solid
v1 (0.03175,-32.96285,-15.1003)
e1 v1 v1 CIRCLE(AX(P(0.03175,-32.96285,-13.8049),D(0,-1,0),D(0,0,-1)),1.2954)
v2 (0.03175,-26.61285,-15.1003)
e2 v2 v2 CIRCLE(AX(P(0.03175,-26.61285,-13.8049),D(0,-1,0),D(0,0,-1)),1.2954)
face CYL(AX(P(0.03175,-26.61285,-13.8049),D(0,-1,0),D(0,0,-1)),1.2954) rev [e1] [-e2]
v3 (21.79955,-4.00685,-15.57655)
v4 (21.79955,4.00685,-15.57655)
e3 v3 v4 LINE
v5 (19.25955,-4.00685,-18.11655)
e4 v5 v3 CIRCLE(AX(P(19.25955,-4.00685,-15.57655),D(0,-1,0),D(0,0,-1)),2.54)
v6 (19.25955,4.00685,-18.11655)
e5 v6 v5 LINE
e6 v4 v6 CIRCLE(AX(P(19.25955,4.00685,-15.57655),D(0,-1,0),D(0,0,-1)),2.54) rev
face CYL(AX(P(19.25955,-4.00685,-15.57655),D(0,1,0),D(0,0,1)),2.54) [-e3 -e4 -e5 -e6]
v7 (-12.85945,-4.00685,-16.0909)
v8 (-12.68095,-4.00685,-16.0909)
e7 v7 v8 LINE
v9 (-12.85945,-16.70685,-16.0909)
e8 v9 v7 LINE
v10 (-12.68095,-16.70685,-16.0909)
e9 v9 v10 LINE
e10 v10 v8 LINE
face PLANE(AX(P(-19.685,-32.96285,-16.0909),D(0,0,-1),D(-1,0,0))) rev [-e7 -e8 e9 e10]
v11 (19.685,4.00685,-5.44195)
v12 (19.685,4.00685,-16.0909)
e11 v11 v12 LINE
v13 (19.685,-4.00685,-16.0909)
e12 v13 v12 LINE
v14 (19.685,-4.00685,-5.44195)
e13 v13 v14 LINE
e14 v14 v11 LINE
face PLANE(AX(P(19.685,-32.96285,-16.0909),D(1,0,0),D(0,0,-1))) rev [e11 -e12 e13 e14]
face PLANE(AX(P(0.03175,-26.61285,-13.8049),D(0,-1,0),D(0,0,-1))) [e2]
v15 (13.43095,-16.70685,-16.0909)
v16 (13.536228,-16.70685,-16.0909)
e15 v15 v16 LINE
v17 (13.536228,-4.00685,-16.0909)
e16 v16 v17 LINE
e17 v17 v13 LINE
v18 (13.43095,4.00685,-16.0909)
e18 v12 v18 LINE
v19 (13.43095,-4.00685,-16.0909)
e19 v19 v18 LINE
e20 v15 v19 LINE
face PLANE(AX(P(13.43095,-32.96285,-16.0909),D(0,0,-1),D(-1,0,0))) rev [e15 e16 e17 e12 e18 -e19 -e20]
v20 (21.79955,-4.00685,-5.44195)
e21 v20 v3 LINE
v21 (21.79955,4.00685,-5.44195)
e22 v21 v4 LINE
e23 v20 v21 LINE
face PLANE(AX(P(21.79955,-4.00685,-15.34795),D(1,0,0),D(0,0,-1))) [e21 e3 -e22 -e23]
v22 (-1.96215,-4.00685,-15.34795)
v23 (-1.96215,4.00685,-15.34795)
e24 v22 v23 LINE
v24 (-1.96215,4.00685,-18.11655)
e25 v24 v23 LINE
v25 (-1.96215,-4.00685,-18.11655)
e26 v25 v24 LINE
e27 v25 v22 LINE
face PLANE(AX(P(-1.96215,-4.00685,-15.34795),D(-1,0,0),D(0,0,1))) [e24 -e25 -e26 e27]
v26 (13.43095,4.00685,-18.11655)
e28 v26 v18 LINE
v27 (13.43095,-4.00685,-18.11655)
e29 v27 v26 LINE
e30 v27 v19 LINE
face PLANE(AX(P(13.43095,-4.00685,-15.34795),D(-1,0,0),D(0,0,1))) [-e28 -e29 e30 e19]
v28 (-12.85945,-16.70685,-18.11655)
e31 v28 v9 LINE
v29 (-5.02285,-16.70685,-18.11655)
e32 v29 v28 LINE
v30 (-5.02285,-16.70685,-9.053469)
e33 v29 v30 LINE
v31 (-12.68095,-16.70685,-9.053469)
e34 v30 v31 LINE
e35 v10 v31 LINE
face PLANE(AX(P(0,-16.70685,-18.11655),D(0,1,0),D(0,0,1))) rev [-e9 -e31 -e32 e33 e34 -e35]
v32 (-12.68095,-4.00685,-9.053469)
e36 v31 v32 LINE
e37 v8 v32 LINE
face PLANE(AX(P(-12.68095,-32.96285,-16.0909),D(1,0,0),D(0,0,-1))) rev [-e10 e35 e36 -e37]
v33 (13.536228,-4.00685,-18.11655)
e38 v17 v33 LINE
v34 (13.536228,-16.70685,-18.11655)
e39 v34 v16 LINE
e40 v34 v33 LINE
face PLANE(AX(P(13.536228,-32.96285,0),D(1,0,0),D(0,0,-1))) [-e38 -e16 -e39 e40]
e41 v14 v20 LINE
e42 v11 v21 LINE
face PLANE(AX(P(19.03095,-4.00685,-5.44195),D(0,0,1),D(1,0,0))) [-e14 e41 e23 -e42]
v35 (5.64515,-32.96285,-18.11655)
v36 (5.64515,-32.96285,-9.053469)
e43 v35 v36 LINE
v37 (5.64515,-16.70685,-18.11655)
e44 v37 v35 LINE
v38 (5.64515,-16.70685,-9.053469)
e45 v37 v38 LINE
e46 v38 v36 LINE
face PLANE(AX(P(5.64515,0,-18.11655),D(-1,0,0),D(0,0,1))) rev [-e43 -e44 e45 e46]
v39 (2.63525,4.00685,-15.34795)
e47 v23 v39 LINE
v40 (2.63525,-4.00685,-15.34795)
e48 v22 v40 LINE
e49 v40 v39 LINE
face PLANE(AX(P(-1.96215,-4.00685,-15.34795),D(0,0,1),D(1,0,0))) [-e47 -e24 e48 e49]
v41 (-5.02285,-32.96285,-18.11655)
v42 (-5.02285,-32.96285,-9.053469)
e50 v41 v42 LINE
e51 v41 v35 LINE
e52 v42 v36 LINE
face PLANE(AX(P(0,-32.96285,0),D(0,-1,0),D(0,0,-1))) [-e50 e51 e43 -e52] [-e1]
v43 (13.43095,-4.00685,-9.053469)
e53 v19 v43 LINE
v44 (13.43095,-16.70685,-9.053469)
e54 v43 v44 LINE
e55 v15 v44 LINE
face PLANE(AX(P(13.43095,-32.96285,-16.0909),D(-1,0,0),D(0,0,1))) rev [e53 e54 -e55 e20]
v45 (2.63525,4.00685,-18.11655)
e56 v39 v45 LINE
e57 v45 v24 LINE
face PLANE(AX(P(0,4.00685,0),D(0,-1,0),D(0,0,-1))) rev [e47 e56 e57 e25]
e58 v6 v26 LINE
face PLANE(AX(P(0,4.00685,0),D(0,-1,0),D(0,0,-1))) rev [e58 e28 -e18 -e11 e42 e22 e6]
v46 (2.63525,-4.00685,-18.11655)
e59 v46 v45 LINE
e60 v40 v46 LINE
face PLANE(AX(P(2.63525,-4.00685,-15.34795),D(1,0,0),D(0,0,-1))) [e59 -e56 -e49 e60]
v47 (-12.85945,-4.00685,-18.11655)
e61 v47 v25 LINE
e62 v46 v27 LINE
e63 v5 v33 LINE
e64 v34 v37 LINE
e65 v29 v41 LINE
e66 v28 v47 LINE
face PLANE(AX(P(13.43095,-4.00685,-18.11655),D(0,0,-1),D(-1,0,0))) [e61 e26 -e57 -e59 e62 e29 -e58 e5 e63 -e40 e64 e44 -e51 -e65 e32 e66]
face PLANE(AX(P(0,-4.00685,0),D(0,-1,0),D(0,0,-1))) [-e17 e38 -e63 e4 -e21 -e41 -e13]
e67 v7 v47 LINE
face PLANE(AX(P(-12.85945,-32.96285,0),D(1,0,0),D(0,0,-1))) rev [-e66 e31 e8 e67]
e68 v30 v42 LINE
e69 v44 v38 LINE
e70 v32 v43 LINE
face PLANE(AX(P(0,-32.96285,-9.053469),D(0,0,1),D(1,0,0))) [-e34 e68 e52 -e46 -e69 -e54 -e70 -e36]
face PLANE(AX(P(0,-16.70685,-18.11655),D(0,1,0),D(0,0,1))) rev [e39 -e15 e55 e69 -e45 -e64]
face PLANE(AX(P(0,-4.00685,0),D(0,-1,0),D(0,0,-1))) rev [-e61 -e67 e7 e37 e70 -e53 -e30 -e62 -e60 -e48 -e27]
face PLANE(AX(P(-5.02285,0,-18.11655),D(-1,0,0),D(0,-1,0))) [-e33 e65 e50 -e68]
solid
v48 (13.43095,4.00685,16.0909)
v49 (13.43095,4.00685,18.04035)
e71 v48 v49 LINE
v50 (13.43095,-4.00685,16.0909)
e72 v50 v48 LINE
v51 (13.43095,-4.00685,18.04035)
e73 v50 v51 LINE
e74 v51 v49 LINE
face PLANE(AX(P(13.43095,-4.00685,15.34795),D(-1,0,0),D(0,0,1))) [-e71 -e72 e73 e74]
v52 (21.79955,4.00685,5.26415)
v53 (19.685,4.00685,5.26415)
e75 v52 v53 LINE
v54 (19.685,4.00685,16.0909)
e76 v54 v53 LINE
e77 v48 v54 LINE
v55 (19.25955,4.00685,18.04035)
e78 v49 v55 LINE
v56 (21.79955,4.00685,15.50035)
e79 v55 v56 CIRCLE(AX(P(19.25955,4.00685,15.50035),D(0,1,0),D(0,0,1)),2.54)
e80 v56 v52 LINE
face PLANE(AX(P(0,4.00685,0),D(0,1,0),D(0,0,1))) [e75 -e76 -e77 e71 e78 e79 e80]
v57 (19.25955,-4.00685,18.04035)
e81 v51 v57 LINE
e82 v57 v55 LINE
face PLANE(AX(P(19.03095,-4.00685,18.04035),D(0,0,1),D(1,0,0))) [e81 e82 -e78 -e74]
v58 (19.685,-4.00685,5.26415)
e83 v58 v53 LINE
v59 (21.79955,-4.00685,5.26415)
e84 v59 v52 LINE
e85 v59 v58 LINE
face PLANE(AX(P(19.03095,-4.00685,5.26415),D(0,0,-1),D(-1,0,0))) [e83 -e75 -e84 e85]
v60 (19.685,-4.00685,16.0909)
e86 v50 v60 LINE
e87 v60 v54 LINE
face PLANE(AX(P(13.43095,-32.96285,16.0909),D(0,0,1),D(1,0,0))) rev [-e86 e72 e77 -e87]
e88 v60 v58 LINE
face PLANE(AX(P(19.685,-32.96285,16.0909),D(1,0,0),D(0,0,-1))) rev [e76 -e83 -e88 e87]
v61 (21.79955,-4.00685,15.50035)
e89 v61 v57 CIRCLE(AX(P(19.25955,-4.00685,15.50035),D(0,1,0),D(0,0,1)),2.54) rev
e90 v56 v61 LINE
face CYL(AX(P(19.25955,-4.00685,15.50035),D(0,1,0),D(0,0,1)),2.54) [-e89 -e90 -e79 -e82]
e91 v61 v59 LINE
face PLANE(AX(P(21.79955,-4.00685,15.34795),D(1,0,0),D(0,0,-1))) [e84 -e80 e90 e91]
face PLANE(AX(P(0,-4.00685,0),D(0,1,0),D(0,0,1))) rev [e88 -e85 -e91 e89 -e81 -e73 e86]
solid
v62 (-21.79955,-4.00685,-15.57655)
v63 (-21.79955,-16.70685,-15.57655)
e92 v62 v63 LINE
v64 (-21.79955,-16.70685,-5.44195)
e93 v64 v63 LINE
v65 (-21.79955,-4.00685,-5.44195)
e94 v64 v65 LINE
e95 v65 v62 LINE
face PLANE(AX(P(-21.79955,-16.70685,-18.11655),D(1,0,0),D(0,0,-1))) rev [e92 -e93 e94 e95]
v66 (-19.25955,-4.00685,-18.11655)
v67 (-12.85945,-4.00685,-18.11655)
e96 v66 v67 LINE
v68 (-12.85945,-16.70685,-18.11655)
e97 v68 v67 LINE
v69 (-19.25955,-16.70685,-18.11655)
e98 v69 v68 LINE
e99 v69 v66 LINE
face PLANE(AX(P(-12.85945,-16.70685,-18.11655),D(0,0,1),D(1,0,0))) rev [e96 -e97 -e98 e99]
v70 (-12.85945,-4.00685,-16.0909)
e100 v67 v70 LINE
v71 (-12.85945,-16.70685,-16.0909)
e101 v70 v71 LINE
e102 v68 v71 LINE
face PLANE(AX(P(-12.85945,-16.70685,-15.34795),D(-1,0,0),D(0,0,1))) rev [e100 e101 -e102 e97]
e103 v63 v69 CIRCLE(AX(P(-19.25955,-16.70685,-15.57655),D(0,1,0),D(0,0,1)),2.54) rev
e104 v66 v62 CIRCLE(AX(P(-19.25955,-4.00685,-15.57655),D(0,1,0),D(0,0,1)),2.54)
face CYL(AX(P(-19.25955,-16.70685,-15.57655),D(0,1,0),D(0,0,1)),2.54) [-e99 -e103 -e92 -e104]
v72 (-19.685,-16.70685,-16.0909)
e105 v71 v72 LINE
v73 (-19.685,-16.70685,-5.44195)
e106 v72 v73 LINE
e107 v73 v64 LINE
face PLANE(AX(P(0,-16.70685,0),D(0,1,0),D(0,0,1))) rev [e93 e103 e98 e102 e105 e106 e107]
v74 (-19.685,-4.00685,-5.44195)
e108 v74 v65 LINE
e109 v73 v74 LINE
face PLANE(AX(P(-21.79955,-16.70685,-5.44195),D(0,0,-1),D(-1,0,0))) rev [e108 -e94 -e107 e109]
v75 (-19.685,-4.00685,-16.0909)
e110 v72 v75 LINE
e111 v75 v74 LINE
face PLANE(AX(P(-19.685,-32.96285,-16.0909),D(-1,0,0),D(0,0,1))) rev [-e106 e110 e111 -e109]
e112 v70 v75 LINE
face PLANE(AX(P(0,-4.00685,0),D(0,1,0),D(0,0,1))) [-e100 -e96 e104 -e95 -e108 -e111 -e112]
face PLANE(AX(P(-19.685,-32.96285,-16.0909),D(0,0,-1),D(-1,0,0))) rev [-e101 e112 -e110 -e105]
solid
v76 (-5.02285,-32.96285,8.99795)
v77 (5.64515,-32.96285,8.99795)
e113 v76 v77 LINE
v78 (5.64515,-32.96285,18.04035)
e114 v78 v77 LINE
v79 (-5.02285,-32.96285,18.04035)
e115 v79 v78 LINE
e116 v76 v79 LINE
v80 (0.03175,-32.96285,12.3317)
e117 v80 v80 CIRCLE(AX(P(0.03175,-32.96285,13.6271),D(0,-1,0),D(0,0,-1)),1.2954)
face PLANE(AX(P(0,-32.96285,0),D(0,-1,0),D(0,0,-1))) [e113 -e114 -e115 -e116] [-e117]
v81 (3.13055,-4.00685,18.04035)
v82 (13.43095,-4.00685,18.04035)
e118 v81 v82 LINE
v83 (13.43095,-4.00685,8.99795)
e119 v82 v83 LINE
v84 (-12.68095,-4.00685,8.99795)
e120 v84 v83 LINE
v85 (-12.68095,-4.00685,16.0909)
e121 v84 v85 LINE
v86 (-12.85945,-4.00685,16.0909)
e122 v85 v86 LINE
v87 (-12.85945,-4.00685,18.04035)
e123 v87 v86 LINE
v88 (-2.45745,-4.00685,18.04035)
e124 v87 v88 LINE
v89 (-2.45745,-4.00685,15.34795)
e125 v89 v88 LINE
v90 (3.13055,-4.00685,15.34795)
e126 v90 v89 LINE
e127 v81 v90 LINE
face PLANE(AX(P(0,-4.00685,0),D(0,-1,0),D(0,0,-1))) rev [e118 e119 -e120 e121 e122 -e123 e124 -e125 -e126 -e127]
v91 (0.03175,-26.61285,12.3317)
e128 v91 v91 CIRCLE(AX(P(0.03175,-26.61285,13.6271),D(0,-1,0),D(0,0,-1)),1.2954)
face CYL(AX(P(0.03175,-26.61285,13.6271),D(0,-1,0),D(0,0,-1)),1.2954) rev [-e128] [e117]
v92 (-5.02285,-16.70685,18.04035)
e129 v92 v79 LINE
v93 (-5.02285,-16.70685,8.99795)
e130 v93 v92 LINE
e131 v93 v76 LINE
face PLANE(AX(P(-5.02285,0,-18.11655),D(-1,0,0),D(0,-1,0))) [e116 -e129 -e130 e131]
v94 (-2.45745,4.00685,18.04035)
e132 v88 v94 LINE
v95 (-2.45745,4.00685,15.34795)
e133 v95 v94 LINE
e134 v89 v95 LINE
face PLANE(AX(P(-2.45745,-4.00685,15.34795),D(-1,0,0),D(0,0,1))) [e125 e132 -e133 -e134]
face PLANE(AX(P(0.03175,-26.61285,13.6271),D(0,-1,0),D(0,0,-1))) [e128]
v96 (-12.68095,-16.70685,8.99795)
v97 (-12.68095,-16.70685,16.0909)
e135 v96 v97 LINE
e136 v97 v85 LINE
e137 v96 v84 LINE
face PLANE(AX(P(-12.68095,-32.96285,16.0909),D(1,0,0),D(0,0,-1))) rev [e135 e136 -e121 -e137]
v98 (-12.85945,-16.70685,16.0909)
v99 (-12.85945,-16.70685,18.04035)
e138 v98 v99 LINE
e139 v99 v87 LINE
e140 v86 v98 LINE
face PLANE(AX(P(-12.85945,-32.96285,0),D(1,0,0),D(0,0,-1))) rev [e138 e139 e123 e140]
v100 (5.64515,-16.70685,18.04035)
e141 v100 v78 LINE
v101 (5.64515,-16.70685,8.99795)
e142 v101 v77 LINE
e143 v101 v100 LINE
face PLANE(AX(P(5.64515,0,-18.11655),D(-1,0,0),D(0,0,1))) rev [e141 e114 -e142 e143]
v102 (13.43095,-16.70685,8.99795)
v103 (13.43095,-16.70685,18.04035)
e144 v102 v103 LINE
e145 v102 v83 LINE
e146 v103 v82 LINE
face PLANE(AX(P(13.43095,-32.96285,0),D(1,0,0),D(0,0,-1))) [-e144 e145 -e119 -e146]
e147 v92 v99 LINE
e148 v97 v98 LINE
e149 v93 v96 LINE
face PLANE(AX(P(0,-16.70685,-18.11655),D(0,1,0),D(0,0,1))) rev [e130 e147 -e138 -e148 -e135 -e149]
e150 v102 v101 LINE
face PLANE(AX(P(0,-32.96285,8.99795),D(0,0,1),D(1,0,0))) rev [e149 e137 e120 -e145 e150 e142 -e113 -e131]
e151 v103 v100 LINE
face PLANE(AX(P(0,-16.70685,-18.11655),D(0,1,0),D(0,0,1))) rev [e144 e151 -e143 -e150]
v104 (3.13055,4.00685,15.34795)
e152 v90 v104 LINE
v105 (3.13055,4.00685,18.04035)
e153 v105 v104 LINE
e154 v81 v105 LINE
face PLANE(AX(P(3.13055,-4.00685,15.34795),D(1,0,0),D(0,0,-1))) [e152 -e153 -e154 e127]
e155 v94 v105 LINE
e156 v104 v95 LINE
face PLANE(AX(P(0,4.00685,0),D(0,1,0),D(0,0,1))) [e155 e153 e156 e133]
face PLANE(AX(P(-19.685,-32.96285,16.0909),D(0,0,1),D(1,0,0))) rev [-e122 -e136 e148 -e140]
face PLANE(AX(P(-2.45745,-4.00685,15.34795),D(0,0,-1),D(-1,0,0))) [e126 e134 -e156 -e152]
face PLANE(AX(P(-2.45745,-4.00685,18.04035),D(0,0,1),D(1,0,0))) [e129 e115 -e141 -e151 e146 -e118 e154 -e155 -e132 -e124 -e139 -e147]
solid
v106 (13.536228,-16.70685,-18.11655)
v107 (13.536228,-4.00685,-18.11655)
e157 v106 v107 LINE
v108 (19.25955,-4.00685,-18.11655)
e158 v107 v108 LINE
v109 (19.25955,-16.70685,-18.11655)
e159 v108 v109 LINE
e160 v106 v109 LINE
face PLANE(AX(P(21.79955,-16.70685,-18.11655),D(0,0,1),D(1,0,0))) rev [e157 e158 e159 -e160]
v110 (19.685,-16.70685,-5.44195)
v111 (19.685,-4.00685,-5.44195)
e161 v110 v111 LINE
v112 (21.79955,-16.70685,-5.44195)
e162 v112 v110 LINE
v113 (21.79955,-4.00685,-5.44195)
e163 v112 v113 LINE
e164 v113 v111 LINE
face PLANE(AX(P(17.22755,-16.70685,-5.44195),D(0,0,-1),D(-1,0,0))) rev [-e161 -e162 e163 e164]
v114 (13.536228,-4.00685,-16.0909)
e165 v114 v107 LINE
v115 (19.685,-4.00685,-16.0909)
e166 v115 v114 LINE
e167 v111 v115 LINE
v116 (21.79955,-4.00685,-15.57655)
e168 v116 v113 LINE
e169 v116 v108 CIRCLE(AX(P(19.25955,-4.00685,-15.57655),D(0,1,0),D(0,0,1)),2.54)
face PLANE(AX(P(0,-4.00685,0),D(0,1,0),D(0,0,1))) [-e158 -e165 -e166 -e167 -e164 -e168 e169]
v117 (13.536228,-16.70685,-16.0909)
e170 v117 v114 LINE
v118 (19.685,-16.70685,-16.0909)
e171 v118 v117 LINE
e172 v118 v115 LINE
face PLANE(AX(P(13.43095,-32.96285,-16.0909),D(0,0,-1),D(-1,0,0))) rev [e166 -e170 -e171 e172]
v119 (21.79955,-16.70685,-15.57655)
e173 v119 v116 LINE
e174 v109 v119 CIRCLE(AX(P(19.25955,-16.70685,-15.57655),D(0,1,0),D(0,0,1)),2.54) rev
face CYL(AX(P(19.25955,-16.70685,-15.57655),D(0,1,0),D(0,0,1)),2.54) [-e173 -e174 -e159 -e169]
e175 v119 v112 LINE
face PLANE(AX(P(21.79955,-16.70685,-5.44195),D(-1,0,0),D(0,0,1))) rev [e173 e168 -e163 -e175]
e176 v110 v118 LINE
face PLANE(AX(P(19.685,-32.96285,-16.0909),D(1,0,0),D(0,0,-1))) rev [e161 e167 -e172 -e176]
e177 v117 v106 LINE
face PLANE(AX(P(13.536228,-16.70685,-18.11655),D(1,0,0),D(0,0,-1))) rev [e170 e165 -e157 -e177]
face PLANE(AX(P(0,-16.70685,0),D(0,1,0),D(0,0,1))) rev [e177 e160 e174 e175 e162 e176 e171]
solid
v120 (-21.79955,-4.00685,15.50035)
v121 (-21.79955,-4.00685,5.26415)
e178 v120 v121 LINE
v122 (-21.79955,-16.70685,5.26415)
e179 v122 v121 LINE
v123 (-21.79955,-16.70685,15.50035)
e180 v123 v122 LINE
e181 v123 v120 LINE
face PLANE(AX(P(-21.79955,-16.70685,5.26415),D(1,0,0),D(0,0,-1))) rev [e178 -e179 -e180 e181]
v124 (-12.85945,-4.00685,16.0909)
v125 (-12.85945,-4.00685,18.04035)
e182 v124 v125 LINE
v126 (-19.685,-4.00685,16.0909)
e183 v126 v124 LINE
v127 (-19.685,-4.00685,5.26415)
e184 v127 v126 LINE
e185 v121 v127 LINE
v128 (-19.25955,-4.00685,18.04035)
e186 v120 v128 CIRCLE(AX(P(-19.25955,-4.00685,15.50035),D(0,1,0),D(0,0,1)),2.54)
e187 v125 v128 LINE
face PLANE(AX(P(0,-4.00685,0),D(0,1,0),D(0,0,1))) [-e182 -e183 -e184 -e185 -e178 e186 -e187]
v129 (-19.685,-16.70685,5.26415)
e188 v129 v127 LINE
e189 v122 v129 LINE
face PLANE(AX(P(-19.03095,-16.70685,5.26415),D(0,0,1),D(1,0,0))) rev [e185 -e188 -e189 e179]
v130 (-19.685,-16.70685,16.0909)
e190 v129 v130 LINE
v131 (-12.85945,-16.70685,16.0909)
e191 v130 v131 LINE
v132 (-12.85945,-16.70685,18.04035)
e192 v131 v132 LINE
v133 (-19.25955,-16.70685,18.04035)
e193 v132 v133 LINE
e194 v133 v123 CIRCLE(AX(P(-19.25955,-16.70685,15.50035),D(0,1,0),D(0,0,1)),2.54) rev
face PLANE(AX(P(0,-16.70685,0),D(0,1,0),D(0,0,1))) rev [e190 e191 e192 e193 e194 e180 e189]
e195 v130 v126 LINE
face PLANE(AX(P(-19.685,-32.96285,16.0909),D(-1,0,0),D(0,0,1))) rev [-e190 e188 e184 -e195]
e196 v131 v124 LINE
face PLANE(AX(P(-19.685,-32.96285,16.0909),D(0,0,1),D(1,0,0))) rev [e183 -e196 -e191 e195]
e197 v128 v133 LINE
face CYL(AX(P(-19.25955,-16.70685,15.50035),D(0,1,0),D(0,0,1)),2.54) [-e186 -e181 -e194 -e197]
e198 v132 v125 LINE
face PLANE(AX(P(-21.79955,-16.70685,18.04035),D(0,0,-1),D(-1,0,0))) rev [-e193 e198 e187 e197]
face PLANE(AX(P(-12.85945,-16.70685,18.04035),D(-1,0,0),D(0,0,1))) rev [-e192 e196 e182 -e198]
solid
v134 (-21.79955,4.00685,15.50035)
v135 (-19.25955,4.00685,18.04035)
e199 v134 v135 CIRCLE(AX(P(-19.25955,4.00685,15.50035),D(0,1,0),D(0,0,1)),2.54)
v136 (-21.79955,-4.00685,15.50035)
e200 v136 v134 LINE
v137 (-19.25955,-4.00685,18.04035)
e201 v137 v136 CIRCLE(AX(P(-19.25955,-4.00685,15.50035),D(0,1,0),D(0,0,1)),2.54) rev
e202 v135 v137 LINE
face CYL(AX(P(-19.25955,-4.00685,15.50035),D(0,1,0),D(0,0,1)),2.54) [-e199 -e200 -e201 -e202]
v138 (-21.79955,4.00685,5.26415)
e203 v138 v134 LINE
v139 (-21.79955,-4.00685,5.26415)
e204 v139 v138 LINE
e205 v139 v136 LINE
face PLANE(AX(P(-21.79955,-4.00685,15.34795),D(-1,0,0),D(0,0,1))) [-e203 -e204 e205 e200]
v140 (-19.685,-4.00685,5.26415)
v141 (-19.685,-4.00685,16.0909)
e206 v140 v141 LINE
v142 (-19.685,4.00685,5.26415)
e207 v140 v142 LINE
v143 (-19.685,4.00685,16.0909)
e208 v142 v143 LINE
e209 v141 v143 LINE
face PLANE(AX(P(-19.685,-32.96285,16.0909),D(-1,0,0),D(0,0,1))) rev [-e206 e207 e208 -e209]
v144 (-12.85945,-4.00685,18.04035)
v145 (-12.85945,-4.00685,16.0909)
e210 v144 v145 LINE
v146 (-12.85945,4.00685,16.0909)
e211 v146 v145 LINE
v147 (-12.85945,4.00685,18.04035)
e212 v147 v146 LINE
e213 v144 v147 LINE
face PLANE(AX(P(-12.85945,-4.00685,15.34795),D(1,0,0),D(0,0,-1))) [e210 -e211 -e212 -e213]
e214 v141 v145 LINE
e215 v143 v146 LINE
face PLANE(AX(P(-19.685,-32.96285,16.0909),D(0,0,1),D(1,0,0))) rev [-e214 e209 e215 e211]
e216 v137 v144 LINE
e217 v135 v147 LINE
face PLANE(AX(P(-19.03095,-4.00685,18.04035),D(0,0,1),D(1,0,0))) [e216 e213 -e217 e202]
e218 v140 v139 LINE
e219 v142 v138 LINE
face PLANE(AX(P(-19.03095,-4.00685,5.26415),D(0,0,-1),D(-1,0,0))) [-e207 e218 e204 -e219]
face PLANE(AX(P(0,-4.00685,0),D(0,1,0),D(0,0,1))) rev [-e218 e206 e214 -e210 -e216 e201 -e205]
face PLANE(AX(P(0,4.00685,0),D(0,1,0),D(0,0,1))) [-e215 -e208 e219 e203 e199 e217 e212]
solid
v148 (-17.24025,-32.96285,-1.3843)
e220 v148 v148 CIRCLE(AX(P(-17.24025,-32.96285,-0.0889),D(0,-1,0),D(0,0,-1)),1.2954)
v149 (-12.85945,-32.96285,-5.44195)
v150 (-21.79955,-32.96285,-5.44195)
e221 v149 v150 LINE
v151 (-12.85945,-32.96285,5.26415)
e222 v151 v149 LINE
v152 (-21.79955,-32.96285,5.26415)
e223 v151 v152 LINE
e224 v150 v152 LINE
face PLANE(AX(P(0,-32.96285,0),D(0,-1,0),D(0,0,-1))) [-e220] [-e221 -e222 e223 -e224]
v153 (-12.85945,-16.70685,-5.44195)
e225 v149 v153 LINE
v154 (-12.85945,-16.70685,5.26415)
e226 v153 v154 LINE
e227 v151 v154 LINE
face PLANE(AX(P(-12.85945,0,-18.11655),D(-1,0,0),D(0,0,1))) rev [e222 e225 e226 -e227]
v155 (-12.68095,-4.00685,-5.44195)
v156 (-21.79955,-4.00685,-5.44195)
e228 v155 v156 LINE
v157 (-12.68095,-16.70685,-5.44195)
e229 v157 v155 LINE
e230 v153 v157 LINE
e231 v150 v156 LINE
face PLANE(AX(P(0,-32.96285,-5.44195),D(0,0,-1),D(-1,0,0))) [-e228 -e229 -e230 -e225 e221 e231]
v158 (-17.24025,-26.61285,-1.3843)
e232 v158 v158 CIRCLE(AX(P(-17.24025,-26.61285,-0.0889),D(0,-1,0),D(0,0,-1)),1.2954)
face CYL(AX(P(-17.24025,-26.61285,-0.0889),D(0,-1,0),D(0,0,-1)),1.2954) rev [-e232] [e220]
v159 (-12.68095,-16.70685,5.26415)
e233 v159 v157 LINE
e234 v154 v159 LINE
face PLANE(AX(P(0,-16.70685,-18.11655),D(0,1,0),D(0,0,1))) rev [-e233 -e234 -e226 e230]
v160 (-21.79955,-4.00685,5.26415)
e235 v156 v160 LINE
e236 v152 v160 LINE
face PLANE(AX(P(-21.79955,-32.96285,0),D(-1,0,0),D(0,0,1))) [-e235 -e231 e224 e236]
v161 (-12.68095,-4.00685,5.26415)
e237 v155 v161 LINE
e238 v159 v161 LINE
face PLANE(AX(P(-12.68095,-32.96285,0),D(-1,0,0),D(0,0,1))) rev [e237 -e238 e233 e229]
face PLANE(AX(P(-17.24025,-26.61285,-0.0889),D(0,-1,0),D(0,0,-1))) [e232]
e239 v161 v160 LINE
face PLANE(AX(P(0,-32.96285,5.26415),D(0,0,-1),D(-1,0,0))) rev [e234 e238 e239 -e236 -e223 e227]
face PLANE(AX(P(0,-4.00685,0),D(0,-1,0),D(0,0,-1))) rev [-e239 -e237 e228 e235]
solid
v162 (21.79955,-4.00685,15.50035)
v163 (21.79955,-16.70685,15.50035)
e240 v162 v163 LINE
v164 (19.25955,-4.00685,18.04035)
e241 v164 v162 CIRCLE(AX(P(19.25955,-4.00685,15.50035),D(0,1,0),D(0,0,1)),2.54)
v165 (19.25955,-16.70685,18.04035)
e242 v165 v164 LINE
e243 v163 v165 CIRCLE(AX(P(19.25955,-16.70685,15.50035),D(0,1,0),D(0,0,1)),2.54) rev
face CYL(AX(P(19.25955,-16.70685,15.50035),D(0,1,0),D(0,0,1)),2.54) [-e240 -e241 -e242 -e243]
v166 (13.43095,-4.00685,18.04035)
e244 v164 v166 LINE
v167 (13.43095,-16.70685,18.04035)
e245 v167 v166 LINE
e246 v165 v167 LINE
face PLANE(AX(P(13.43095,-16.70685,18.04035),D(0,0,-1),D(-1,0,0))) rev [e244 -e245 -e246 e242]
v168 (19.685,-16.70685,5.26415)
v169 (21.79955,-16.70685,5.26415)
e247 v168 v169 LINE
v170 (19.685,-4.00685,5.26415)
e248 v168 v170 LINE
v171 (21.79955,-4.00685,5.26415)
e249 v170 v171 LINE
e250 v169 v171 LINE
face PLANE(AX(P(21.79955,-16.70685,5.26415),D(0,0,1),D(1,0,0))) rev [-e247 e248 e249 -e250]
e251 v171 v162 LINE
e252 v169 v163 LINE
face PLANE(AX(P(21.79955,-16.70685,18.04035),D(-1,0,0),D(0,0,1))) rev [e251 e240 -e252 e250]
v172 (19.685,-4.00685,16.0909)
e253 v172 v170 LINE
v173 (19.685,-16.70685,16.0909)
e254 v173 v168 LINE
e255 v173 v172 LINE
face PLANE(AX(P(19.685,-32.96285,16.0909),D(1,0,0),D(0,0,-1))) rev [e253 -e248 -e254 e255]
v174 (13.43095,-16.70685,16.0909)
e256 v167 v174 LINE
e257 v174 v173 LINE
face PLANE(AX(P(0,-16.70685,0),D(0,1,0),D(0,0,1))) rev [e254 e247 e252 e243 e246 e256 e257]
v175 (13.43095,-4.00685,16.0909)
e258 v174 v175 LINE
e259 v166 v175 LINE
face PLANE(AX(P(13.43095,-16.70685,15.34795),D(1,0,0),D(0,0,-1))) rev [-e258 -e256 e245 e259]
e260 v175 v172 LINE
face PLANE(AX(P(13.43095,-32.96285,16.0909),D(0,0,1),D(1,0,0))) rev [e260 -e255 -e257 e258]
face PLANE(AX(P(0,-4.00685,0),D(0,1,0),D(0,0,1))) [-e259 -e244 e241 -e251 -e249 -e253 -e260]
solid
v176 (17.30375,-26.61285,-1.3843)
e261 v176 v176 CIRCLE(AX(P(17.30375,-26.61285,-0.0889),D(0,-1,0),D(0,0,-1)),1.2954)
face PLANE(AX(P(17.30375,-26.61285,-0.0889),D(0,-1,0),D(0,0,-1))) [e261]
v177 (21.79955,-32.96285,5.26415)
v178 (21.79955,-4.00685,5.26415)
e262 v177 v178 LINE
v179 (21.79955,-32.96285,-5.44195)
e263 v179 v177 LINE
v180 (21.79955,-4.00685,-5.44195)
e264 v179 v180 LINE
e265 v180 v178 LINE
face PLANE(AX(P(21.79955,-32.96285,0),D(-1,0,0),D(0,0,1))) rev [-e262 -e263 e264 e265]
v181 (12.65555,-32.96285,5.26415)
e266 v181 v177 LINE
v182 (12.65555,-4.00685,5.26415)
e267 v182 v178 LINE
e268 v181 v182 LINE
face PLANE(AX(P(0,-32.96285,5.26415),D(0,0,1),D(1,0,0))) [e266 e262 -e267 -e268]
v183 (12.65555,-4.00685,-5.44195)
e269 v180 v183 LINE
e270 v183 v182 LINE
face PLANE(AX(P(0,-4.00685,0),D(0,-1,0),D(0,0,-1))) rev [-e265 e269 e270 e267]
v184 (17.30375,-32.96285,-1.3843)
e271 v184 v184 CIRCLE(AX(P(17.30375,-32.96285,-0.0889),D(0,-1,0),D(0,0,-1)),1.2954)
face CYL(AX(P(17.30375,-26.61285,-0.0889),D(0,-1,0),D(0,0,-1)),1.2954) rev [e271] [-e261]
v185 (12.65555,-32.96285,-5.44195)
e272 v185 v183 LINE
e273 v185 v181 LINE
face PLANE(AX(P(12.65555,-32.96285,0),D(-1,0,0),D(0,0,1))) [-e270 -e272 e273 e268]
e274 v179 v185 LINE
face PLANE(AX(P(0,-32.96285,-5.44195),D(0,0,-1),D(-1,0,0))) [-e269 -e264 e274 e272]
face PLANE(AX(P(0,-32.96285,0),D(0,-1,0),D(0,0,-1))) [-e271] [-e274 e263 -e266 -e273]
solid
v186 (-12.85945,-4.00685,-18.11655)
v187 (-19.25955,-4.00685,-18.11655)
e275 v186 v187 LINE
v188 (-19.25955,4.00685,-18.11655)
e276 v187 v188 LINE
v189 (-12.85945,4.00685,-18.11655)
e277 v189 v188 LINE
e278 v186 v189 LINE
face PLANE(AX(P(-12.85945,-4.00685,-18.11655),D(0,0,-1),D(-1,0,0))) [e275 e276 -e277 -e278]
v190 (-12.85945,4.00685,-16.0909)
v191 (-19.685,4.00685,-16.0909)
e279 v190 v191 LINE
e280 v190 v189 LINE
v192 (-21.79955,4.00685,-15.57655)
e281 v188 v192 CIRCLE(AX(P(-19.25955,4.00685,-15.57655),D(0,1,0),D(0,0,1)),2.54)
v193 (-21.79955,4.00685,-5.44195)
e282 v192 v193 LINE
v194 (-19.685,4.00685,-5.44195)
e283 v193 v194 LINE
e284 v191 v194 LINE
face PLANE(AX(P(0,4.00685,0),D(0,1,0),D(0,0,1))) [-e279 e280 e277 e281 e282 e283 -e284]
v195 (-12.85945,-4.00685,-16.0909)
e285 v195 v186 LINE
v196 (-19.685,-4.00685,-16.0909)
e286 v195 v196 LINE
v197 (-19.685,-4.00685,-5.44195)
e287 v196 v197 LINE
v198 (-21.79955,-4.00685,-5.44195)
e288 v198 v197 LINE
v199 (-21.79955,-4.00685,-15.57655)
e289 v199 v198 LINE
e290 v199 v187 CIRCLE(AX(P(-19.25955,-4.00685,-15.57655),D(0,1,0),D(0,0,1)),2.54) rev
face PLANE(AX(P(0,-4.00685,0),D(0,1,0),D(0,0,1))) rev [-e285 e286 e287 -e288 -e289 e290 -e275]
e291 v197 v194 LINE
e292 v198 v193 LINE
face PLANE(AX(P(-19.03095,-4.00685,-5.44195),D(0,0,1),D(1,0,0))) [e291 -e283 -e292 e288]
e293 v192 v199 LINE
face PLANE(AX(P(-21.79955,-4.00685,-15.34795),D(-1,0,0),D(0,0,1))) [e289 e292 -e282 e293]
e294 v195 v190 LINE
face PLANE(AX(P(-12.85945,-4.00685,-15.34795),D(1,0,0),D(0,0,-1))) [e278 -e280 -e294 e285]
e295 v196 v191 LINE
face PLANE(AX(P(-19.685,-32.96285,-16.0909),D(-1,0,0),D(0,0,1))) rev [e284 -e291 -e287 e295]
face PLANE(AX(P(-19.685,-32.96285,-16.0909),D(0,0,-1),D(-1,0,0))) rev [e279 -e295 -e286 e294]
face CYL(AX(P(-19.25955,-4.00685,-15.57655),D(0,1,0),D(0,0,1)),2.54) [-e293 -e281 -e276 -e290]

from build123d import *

# Parameters (mm, degrees)
BOSS_EXTRUDE1_DEPTH        = 4.00685
BOSS_EXTRUDE1_DEPTH_BACK   = 4.00685
SKETCH2_W                  = 4.5974
SKETCH2_H                  = 2.7686
BOSS_EXTRUDE1_2_DEPTH      = 4.00685
BOSS_EXTRUDE1_2_DEPTH_BACK = 4.00685
BOSS_EXTRUDE1_3_DEPTH      = 4.00685
BOSS_EXTRUDE1_3_DEPTH_BACK = 4.00685
BOSS_EXTRUDE1_4_DEPTH      = 4.00685
BOSS_EXTRUDE1_4_DEPTH_BACK = 4.00685
SKETCH2_W_2                = 5.588
SKETCH2_H_2                = 2.6924
BOSS_EXTRUDE1_5_DEPTH      = 4.00685
BOSS_EXTRUDE1_5_DEPTH_BACK = 4.00685
BOSS_EXTRUDE1_6_DEPTH      = 4.00685
BOSS_EXTRUDE1_6_DEPTH_BACK = 4.00685
SKETCH3_W                  = 9.1186
SKETCH3_H                  = 10.7061
BOSS_EXTRUDE2_DEPTH        = 28.956
BOSS_EXTRUDE4_DEPTH        = 12.7
BOSS_EXTRUDE4_2_DEPTH      = 12.7
BOSS_EXTRUDE4_3_DEPTH      = 12.7
BOSS_EXTRUDE4_4_DEPTH      = 12.7
CUT_EXTRUDE4_DEPTH         = 44.473891524
CUT_EXTRUDE4_DEPTH_BACK    = 44.473891524
SKETCH6_W                  = 6.25405
SKETCH6_H                  = 10.64895
SKETCH6_W_2                = 7.00405
SKETCH6_H_2                = 10.82675
CUT_EXTRUDE5_START         = -36.1569
CUT_EXTRUDE5_OUTLINE_W     = 7.8366
CUT_EXTRUDE5_OUTLINE_H     = 16.256
CUT_EXTRUDE5_DEPTH         = 36.1569
CUT_EXTRUDE5_2_OUTLINE_W   = 7.7858
CUT_EXTRUDE5_2_OUTLINE_H   = 16.256
CUT_EXTRUDE5_2_DEPTH       = 9.063080747
CUT_EXTRUDE5_START_2       = -9.0424
CUT_EXTRUDE5_3_OUTLINE_W   = 7.7858
CUT_EXTRUDE5_3_OUTLINE_H   = 16.256
CUT_EXTRUDE5_3_DEPTH       = 9.0424
SKETCH9_W                  = 2.02565
SKETCH9_H                  = 16.256
CUT_EXTRUDE6_DEPTH         = 3.556
FILLET2_R                  = 2.54
FILLET3_R                  = 2.54
FILLET4_R                  = 2.54
FILLET5_R                  = 2.54
FILLET6_R                  = 2.54
FILLET7_R                  = 2.54
FILLET8_R                  = 2.54
FILLET9_R                  = 2.54
SKETCH10_R                 = 1.2954
CUT_EXTRUDE7_DEPTH         = 6.35


# Read off the part's stored shape, not the designer's step: Cut-Extrude5
with BuildPart() as part:
    # Sketch2 → Boss-Extrude1 (new, two sides: drawn at the far end of the back side and taken through both)
    with BuildSketch(Plane(origin=(0, 0, 0), x_dir=(1, 0, 0), z_dir=(0, 1, 0)).offset(-BOSS_EXTRUDE1_DEPTH_BACK)):
        with Locations((0.33655, 16.73225)):
            Rectangle(SKETCH2_W, SKETCH2_H)
    extrude(amount=BOSS_EXTRUDE1_DEPTH + BOSS_EXTRUDE1_DEPTH_BACK)


with BuildPart() as body_2:
    # Sketch2 → Boss-Extrude1 2 (new, two sides: drawn at the far end of the back side and taken through both)
    with BuildSketch(Plane(origin=(0, 0, 0), x_dir=(1, 0, 0), z_dir=(0, 1, 0)).offset(-BOSS_EXTRUDE1_2_DEPTH_BACK)):
        Polygon((13.43095, 15.34795), (19.03095, 15.34795), (19.03095, 5.44195), (21.79955, 5.44195), (21.79955, 15.34795), (21.79955, 18.11655), (19.03095, 18.11655), (13.43095, 18.11655), align=None)
    extrude(amount=BOSS_EXTRUDE1_2_DEPTH + BOSS_EXTRUDE1_2_DEPTH_BACK)


    add(part.part)  # Boss-Extrude2 merges part


with BuildPart() as body_3:
    # Sketch2 → Boss-Extrude1 3 (new, two sides: drawn at the far end of the back side and taken through both)
    with BuildSketch(Plane(origin=(0, 0, 0), x_dir=(1, 0, 0), z_dir=(0, 1, 0)).offset(-BOSS_EXTRUDE1_3_DEPTH_BACK)):
        Polygon((-19.03095, -15.34795), (-12.85945, -15.34795), (-12.85945, -18.04035), (-19.03095, -18.04035), (-21.79955, -18.04035), (-21.79955, -15.34795), (-21.79955, -5.26415), (-19.03095, -5.26415), align=None)
    extrude(amount=BOSS_EXTRUDE1_3_DEPTH + BOSS_EXTRUDE1_3_DEPTH_BACK)


with BuildPart() as body_4:
    # Sketch2 → Boss-Extrude1 4 (new, two sides: drawn at the far end of the back side and taken through both)
    with BuildSketch(Plane(origin=(0, 0, 0), x_dir=(1, 0, 0), z_dir=(0, 1, 0)).offset(-BOSS_EXTRUDE1_4_DEPTH_BACK)):
        with Locations((0.33655, -16.69415)):
            Rectangle(SKETCH2_W_2, SKETCH2_H_2)
    extrude(amount=BOSS_EXTRUDE1_4_DEPTH + BOSS_EXTRUDE1_4_DEPTH_BACK)


with BuildPart() as body_5:
    # Sketch2 → Boss-Extrude1 5 (new, two sides: drawn at the far end of the back side and taken through both)
    with BuildSketch(Plane(origin=(0, 0, 0), x_dir=(1, 0, 0), z_dir=(0, 1, 0)).offset(-BOSS_EXTRUDE1_5_DEPTH_BACK)):
        Polygon((13.43095, -15.34795), (19.03095, -15.34795), (19.03095, -5.26415), (21.79955, -5.26415), (21.79955, -15.34795), (21.79955, -18.04035), (19.03095, -18.04035), (13.43095, -18.04035), align=None)
    extrude(amount=BOSS_EXTRUDE1_5_DEPTH + BOSS_EXTRUDE1_5_DEPTH_BACK)


with BuildPart() as body_6:
    # Sketch2 → Boss-Extrude1 6 (new, two sides: drawn at the far end of the back side and taken through both)
    with BuildSketch(Plane(origin=(0, 0, 0), x_dir=(1, 0, 0), z_dir=(0, 1, 0)).offset(-BOSS_EXTRUDE1_6_DEPTH_BACK)):
        Polygon((-12.85945, 15.34795), (-19.03095, 15.34795), (-19.03095, 5.44195), (-21.79955, 5.44195), (-21.79955, 15.34795), (-21.79955, 18.11655), (-19.03095, 18.11655), (-12.85945, 18.11655), align=None)
    extrude(amount=BOSS_EXTRUDE1_6_DEPTH + BOSS_EXTRUDE1_6_DEPTH_BACK)


with BuildPart() as body_2_1:
    add(body_2.part)

    add(body_4.part)  # Boss-Extrude2 merges body 4
    # Sketch3 → Boss-Extrude2 (add)
    with BuildSketch(Plane.XZ.offset(4.00685)):
        Polygon((13.43095, 18.04035), (-12.85945, 18.04035), (-12.85945, 8.99795), (13.43095, 8.99795), (13.43095, 15.34795), align=None)
        with Locations((-17.24025, -0.0889)):
            Rectangle(SKETCH3_W, SKETCH3_H)
        Polygon((-12.85945, -9.053469253), (-12.85945, -11.76655), (-12.85945, -18.11655), (13.536228167, -18.11655), (13.536228167, -9.053469253), align=None)
        Polygon((12.65555, -5.44195), (21.79955, -5.44195), (21.79955, 5.26415), (19.03095, 5.26415), (12.65555, 5.26415), align=None)
    extrude(amount=BOSS_EXTRUDE2_DEPTH)


with BuildPart() as body_5_2:
    # Sketch5 → Boss-Extrude4 (new body)
    with BuildSketch(Plane.XZ.offset(4.00685)):
        Polygon((-21.79955, 5.26415), (-21.79955, 18.04035), (-12.85945, 18.04035), (-12.85945, 15.34795), (-19.03095, 15.34795), (-19.03095, 5.26415), align=None)
    extrude(amount=BOSS_EXTRUDE4_DEPTH)


with BuildPart() as body_6_2:
    # Sketch5 → Boss-Extrude4 2 (new body)
    with BuildSketch(Plane.XZ.offset(4.00685)):
        Polygon((-21.79955, -5.44195), (-19.03095, -5.44195), (-19.03095, -15.34795), (-12.85945, -15.34795), (-12.85945, -18.11655), (-21.79955, -18.11655), align=None)
    extrude(amount=BOSS_EXTRUDE4_2_DEPTH)


with BuildPart() as body_7:
    # Sketch5 → Boss-Extrude4 3 (new body)
    with BuildSketch(Plane.XZ.offset(4.00685)):
        Polygon((13.43095, 18.04035), (21.79955, 18.04035), (21.79955, 5.26415), (19.03095, 5.26415), (19.03095, 15.34795), (13.43095, 15.34795), align=None)
    extrude(amount=BOSS_EXTRUDE4_3_DEPTH)


with BuildPart() as body_8:
    # Sketch5 → Boss-Extrude4 4 (new body)
    with BuildSketch(Plane.XZ.offset(4.00685)):
        Polygon((17.22755, -5.44195), (21.79955, -5.44195), (21.79955, -18.11655), (13.536228167, -18.11655), (13.536228167, -15.34795), (19.03095, -15.34795), align=None)
    extrude(amount=BOSS_EXTRUDE4_4_DEPTH)


with BuildPart() as cut_extrude4_tool:
    # Sketch6 → Cut-Extrude4 (new, two sides: drawn at the far end of the back side and taken through both)
    with BuildSketch(Plane(origin=(0, 0, 0), x_dir=(1, 0, 0), z_dir=(0, 1, 0)).offset(-CUT_EXTRUDE4_DEPTH_BACK)):
        with Locations((16.557975, 10.766425)):
            Rectangle(SKETCH6_W, SKETCH6_H)
        with Locations((-16.182975, 10.766425)):
            Rectangle(SKETCH6_W_2, SKETCH6_H)
        with Locations((-16.182975, -10.677525)):
            Rectangle(SKETCH6_W_2, SKETCH6_H_2)
        with Locations((16.557975, -10.677525)):
            Rectangle(SKETCH6_W, SKETCH6_H_2)
    extrude(amount=CUT_EXTRUDE4_DEPTH + CUT_EXTRUDE4_DEPTH_BACK)


with BuildPart() as body_2_2:
    add(body_2_1.part)

    # Cut-Extrude4: cut by cut_extrude4_tool
    add(cut_extrude4_tool.part, mode=Mode.SUBTRACT)

    # Cut-Extrude5 outline → Cut-Extrude5 (cut)
    with BuildSketch(Plane.XY.offset(18.04035).offset(CUT_EXTRUDE5_START)):
        with Locations((-8.94115, -24.83485)):
            Rectangle(CUT_EXTRUDE5_OUTLINE_W, CUT_EXTRUDE5_OUTLINE_H)
    extrude(amount=CUT_EXTRUDE5_DEPTH, mode=Mode.SUBTRACT)

    # Cut-Extrude5 2 outline → Cut-Extrude5 2 (cut)
    with BuildSketch(Plane.XY.offset(18.04035).offset(CUT_EXTRUDE5_START)):
        with Locations((9.53805, -24.83485)):
            Rectangle(CUT_EXTRUDE5_2_OUTLINE_W, CUT_EXTRUDE5_2_OUTLINE_H)
    extrude(amount=CUT_EXTRUDE5_2_DEPTH, mode=Mode.SUBTRACT)

    # Cut-Extrude5 3 outline → Cut-Extrude5 3 (cut)
    with BuildSketch(Plane.XY.offset(18.04035).offset(CUT_EXTRUDE5_START_2)):
        with Locations((9.53805, -24.83485)):
            Rectangle(CUT_EXTRUDE5_3_OUTLINE_W, CUT_EXTRUDE5_3_OUTLINE_H)
    extrude(amount=CUT_EXTRUDE5_3_DEPTH, mode=Mode.SUBTRACT)

    # Sketch9 → Cut-Extrude6 (cut)
    with BuildSketch(Plane(origin=(13.536228167, 0, 0), x_dir=(0, 0, -1), z_dir=(1, 0, 0))):
        with Locations((17.103725, -24.83485)):
            Rectangle(SKETCH9_W, SKETCH9_H)
    extrude(amount=-CUT_EXTRUDE6_DEPTH, mode=Mode.SUBTRACT)

    # Fillet4
    fillet4_edges = [body_2_2.edges().sort_by_distance(p)[0] for p in [
        (21.79955, 0, -18.11655),
    ]]
    fillet(fillet4_edges, radius=FILLET4_R)

    # Sketch10 → Cut-Extrude7 (cut)
    with BuildSketch(Plane.XZ.offset(32.96285)):
        with Locations(Location((-17.24025, -0.0889, 0), (0, 0, 270))):
            Circle(SKETCH10_R)
        with Locations(Location((17.30375, -0.0889, 0), (0, 0, 270))):
            Circle(SKETCH10_R)
        with Locations(Location((0.03175, 13.6271, 0), (0, 0, 270))):
            Circle(SKETCH10_R)
        with Locations(Location((0.03175, -13.8049, 0), (0, 0, 270))):
            Circle(SKETCH10_R)
    extrude(amount=-CUT_EXTRUDE7_DEPTH, mode=Mode.SUBTRACT)


with BuildPart() as body_3_1:
    add(body_3.part)

    # Cut-Extrude4: cut by cut_extrude4_tool
    add(cut_extrude4_tool.part, mode=Mode.SUBTRACT)

    # Fillet6
    fillet6_edges = [body_3_1.edges().sort_by_distance(p)[0] for p in [
        (-21.79955, 0, 18.04035),
    ]]
    fillet(fillet6_edges, radius=FILLET6_R)


with BuildPart() as body_5_1:
    add(body_5.part)

    # Cut-Extrude4: cut by cut_extrude4_tool
    add(cut_extrude4_tool.part, mode=Mode.SUBTRACT)

    # Fillet9
    fillet9_edges = [body_5_1.edges().sort_by_distance(p)[0] for p in [
        (21.79955, 0, 18.04035),
    ]]
    fillet(fillet9_edges, radius=FILLET9_R)


with BuildPart() as body_6_1:
    add(body_6.part)

    # Cut-Extrude4: cut by cut_extrude4_tool
    add(cut_extrude4_tool.part, mode=Mode.SUBTRACT)

    # Fillet3
    fillet3_edges = [body_6_1.edges().sort_by_distance(p)[0] for p in [
        (-21.79955, 0, -18.11655),
    ]]
    fillet(fillet3_edges, radius=FILLET3_R)


with BuildPart() as body_5_2_1:
    add(body_5_2.part)

    # Cut-Extrude4: cut by cut_extrude4_tool
    add(cut_extrude4_tool.part, mode=Mode.SUBTRACT)

    # Fillet7
    fillet7_edges = [body_5_2_1.edges().sort_by_distance(p)[0] for p in [
        (-21.79955, -10.35685, 18.04035),
    ]]
    fillet(fillet7_edges, radius=FILLET7_R)


with BuildPart() as body_6_2_1:
    add(body_6_2.part)

    # Cut-Extrude4: cut by cut_extrude4_tool
    add(cut_extrude4_tool.part, mode=Mode.SUBTRACT)

    # Fillet2
    fillet2_edges = [body_6_2_1.edges().sort_by_distance(p)[0] for p in [
        (-21.79955, -10.35685, -18.11655),
    ]]
    fillet(fillet2_edges, radius=FILLET2_R)


with BuildPart() as body_7_1:
    add(body_7.part)

    # Cut-Extrude4: cut by cut_extrude4_tool
    add(cut_extrude4_tool.part, mode=Mode.SUBTRACT)

    # Fillet8
    fillet8_edges = [body_7_1.edges().sort_by_distance(p)[0] for p in [
        (21.79955, -10.35685, 18.04035),
    ]]
    fillet(fillet8_edges, radius=FILLET8_R)


with BuildPart() as body_8_1:
    add(body_8.part)

    # Cut-Extrude4: cut by cut_extrude4_tool
    add(cut_extrude4_tool.part, mode=Mode.SUBTRACT)

    # Fillet5
    fillet5_edges = [body_8_1.edges().sort_by_distance(p)[0] for p in [
        (21.79955, -10.35685, -18.11655),
    ]]
    fillet(fillet5_edges, radius=FILLET5_R)


solid = Compound([body_2_2.part, body_3_1.part, body_5_1.part, body_6_1.part, body_5_2_1.part, body_6_2_1.part, body_7_1.part, body_8_1.part])
